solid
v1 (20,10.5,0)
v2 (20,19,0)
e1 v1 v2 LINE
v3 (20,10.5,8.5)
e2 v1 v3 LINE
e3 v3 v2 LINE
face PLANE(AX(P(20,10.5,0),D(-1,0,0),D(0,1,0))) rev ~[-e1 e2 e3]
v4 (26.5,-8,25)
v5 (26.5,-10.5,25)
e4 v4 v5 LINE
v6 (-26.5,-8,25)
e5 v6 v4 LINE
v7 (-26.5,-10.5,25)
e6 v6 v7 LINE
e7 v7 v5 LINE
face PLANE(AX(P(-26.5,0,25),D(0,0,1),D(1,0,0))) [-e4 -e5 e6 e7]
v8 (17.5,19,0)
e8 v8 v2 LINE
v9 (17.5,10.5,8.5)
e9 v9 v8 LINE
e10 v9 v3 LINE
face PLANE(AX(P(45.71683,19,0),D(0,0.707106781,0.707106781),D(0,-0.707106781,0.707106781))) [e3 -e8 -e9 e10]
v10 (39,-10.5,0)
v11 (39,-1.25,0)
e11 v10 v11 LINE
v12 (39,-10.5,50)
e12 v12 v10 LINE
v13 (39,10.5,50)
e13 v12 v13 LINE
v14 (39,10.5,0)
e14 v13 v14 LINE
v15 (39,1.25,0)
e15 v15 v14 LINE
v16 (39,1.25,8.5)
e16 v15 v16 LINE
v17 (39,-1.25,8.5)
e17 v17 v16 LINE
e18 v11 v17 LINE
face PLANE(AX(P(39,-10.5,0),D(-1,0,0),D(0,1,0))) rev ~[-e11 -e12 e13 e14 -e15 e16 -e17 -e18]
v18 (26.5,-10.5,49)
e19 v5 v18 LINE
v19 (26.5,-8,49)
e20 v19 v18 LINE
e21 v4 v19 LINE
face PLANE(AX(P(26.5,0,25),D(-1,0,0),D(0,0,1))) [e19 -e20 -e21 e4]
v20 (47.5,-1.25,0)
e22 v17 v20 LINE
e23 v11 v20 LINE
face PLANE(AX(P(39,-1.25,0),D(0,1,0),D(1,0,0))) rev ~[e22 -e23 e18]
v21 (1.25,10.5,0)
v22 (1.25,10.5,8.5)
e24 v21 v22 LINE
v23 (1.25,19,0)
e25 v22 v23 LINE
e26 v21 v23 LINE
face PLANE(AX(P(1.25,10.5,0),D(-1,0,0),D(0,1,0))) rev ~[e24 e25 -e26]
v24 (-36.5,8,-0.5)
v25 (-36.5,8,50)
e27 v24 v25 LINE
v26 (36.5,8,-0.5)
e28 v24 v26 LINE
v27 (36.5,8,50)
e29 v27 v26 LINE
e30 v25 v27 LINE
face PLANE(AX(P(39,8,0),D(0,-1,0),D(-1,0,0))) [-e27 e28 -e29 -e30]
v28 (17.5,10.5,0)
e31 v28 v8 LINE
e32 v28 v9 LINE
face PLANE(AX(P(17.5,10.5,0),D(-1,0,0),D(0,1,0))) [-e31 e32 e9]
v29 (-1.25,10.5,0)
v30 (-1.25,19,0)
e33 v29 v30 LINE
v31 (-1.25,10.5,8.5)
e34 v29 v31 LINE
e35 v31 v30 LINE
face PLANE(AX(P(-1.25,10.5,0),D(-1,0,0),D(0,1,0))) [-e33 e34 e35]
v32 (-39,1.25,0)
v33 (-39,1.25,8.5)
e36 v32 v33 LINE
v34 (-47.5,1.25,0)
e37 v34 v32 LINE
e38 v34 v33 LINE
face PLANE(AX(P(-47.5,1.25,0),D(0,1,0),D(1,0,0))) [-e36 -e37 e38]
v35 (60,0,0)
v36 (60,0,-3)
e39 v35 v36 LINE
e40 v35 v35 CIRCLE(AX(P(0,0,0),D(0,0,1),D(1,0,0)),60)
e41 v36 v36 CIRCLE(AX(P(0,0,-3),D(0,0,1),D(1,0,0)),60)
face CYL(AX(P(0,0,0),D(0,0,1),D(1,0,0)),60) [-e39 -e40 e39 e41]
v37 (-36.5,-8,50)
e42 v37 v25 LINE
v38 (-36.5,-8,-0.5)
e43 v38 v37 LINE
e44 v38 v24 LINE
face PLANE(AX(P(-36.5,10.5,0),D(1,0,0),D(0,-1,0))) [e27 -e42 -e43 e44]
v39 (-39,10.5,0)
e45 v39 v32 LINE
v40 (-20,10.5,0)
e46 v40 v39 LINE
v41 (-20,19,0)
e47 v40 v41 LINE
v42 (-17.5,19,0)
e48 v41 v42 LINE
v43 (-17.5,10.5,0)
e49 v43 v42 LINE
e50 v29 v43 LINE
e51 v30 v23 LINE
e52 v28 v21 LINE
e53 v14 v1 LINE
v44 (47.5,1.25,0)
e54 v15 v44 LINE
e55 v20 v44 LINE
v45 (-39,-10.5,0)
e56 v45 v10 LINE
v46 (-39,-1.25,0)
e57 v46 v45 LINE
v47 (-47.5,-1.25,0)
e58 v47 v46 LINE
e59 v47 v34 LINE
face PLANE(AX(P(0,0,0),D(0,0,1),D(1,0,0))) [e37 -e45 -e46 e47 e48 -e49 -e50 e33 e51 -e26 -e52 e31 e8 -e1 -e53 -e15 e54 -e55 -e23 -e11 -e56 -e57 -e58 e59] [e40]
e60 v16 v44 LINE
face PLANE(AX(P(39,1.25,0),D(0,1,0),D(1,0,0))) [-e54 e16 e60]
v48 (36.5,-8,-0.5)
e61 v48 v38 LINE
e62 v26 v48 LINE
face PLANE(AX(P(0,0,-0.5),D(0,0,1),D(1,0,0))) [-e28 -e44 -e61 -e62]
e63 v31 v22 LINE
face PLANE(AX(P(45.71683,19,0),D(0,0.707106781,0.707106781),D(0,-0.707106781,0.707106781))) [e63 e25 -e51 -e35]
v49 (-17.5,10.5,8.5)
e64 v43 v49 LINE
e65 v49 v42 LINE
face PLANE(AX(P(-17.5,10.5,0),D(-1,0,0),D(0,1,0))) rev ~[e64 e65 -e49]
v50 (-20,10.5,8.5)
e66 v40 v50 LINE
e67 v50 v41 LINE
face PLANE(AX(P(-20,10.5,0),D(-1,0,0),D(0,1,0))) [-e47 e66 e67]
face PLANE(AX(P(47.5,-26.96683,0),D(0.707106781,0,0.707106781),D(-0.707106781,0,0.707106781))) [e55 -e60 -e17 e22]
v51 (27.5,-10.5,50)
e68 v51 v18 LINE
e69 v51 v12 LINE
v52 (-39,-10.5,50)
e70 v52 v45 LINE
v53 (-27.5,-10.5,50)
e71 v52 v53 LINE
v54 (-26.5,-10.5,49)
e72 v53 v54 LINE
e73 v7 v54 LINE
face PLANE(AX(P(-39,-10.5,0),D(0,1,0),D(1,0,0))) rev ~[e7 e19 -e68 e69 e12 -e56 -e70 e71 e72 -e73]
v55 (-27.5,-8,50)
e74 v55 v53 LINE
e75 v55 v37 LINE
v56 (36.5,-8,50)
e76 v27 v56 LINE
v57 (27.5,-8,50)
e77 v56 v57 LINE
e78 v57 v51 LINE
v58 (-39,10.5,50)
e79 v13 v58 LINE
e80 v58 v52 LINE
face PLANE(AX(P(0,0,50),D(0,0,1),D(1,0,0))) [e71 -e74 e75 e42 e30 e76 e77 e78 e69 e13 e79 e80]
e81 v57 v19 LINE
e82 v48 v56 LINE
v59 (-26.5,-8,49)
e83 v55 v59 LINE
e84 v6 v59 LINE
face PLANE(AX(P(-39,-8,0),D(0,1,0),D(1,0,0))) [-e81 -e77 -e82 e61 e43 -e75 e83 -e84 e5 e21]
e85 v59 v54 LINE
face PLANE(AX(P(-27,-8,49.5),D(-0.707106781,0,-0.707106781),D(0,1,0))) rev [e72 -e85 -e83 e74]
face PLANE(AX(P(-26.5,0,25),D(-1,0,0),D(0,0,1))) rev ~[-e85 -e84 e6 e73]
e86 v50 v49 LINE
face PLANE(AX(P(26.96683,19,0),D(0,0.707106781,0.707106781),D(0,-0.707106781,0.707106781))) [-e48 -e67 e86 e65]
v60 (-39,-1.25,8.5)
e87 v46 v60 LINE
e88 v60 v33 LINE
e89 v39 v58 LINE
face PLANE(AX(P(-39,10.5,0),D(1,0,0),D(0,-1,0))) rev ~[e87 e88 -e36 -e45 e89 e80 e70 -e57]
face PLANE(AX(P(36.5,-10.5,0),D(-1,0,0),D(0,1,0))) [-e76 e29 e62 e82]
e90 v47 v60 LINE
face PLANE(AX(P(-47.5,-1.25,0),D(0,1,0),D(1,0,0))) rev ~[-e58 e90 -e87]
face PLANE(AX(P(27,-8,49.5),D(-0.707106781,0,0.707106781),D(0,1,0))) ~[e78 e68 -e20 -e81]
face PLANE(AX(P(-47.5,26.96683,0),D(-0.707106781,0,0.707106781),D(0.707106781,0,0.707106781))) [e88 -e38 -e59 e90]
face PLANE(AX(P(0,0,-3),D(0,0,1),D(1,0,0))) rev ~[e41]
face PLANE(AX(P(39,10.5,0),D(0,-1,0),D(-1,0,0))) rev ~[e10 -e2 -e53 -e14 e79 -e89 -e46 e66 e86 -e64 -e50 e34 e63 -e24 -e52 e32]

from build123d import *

# Parameters (mm, degrees)
F0_R         = 60
F0_W         = 8.5
F0_H         = 2.5
F0_W_2       = 2.5
F0_H_2       = 8.5
F2_DEPTH     = 3
F3_DEPTH     = 50
F4_T         = -2.5
F5_DEPTH     = 10
F6_T4_DEPTH  = 53.9336597593
F6_T10_DEPTH = 53.9336597593
F6_T16_DEPTH = 53.9336597593
F6_T22_DEPTH = 53.9336597593
F6_T28_DEPTH = 53.9336597593
F1_W         = 53
F1_H         = 50
F7_DEPTH     = 25
F8_SIZE      = 1


# Not quite as in the source:
# - a fillet or chamfer that OpenCascade refuses, or shapes differently, is made with other operations: its cross-section is extruded or revolved along the edge and cut away or added


with BuildPart() as f2:
    # F0 (on Top) → F2 (new body)
    with BuildSketch(Plane.XY):
        Circle(F0_R)
        Polygon((20, 10.5), (39, 10.5), (39, 1.25), (47.5, 1.25), (47.5, -1.25), (39, -1.25), (39, -10.5), (-39, -10.5), (-39, -1.25), (-47.5, -1.25), (-47.5, 1.25), (-39, 1.25), (-39, 10.5), (-20, 10.5), (-20, 19), (-17.5, 19), (-17.5, 10.5), (-1.25, 10.5), (-1.25, 19), (1.25, 19), (1.25, 10.5), (17.5, 10.5), (17.5, 19), (20, 19), align=None, mode=Mode.SUBTRACT)
        Polygon((39, 1.25), (39, 10.5), (20, 10.5), (17.5, 10.5), (1.25, 10.5), (-1.25, 10.5), (-17.5, 10.5), (-20, 10.5), (-39, 10.5), (-39, 1.25), (-39, -1.25), (-39, -10.5), (39, -10.5), (39, -1.25), align=None)
        with Locations((-43.25, 0)):
            Rectangle(F0_W, F0_H)
        with Locations((-18.75, 14.75)):
            Rectangle(F0_W_2, F0_H_2)
        with Locations((0, 14.75)):
            Rectangle(F0_W_2, F0_H_2)
        with Locations((18.75, 14.75)):
            Rectangle(F0_W_2, F0_H_2)
        with Locations((43.25, 0)):
            Rectangle(F0_W, F0_H)
    extrude(amount=-F2_DEPTH)

    # F0 (on Top) → F3 (join)
    with BuildSketch(Plane.XY):
        Polygon((39, 1.25), (39, 10.5), (20, 10.5), (17.5, 10.5), (1.25, 10.5), (-1.25, 10.5), (-17.5, 10.5), (-20, 10.5), (-39, 10.5), (-39, 1.25), (-39, -1.25), (-39, -10.5), (39, -10.5), (39, -1.25), align=None)
    extrude(amount=F3_DEPTH)

    # F4
    f4_openings = [f2.faces().sort_by_distance(p)[0] for p in [
        (0, 0, 50),
    ]]
    offset(amount=F4_T, openings=f4_openings, kind=Kind.INTERSECTION)

    # F0 (on Top) → F5 (join)
    with BuildSketch(Plane.XY):
        with Locations((18.75, 14.75)):
            Rectangle(F0_W_2, F0_H_2)
        with Locations((43.25, 0)):
            Rectangle(F0_W, F0_H)
        with Locations((0, 14.75)):
            Rectangle(F0_W_2, F0_H_2)
        with Locations((-18.75, 14.75)):
            Rectangle(F0_W_2, F0_H_2)
        with Locations((-43.25, 0)):
            Rectangle(F0_W, F0_H)
    extrude(amount=F5_DEPTH)

    # F6: chamfer of 10 on 5 edges, made by hand


with BuildPart() as f6_tool2:
    # F6_s3 → F6_t4 (new body)
    with BuildSketch(Plane.XZ.offset(26.9668298797)):
        Polygon((47.5, 0), (37.5, 10), (47.5, 10), align=None)
    extrude(amount=-F6_T4_DEPTH)

    split(bisect_by=Plane.XY, keep=Keep.TOP)

    split(bisect_by=Plane.YZ.offset(39), keep=Keep.TOP)


with BuildPart() as f2_1:
    add(f2.part)

    # F6_t1: cut F6_tool2
    add(f6_tool2.part, mode=Mode.SUBTRACT)


with BuildPart() as f6_tool8:
    # F6_s9 → F6_t10 (new body)
    with BuildSketch(Plane.YZ.offset(45.7168298797)):
        Polygon((19, 0), (9, 10), (19, 10), align=None)
    extrude(amount=-F6_T10_DEPTH)

    split(bisect_by=Plane.XY, keep=Keep.TOP)

    split(bisect_by=Plane.XZ.offset(-10.5), keep=Keep.BOTTOM)


with BuildPart() as f2_2:
    add(f2_1.part)

    # F6_t7: cut F6_tool8
    add(f6_tool8.part, mode=Mode.SUBTRACT)


with BuildPart() as f6_tool14:
    # F6_s15 → F6_t16 (new body)
    with BuildSketch(Plane.YZ.offset(26.9668298797)):
        Polygon((19, 0), (9, 10), (19, 10), align=None)
    extrude(amount=-F6_T16_DEPTH)

    split(bisect_by=Plane.XY, keep=Keep.TOP)

    split(bisect_by=Plane.XZ.offset(-10.5), keep=Keep.BOTTOM)


with BuildPart() as f2_3:
    add(f2_2.part)

    # F6_t13: cut F6_tool14
    add(f6_tool14.part, mode=Mode.SUBTRACT)


with BuildPart() as f6_tool20:
    # F6_s21 → F6_t22 (new body)
    with BuildSketch(Plane.YZ.offset(8.2168298797)):
        Polygon((19, 0), (9, 10), (19, 10), align=None)
    extrude(amount=-F6_T22_DEPTH)

    split(bisect_by=Plane.XY, keep=Keep.TOP)

    split(bisect_by=Plane.XZ.offset(-10.5), keep=Keep.BOTTOM)


with BuildPart() as f2_4:
    add(f2_3.part)

    # F6_t19: cut F6_tool20
    add(f6_tool20.part, mode=Mode.SUBTRACT)


with BuildPart() as f6_tool26:
    # F6_s27 → F6_t28 (new body)
    with BuildSketch(Plane.XZ.offset(-26.9668298797)):
        Polygon((-47.5, 0), (-37.5, 10), (-47.5, 10), align=None)
    extrude(amount=F6_T28_DEPTH)

    split(bisect_by=Plane.XY, keep=Keep.TOP)

    split(bisect_by=Plane.YZ.offset(-39), keep=Keep.BOTTOM)


with BuildPart() as f2_5:
    add(f2_4.part)

    # F6_t25: cut F6_tool26
    add(f6_tool26.part, mode=Mode.SUBTRACT)

    # F1 (on Front) → F7 (cut)
    with BuildSketch(Plane.XZ):
        with Locations((0, 50)):
            Rectangle(F1_W, F1_H)
    extrude(amount=F7_DEPTH, mode=Mode.SUBTRACT)

    # F8
    f8_edges = [f2_5.edges().sort_by_distance(p)[0] for p in [
        (-26.5, -9.25, 50),
        (26.5, -9.25, 50),
    ]]
    chamfer(f8_edges, length=F8_SIZE)


solid = f2_5.part
